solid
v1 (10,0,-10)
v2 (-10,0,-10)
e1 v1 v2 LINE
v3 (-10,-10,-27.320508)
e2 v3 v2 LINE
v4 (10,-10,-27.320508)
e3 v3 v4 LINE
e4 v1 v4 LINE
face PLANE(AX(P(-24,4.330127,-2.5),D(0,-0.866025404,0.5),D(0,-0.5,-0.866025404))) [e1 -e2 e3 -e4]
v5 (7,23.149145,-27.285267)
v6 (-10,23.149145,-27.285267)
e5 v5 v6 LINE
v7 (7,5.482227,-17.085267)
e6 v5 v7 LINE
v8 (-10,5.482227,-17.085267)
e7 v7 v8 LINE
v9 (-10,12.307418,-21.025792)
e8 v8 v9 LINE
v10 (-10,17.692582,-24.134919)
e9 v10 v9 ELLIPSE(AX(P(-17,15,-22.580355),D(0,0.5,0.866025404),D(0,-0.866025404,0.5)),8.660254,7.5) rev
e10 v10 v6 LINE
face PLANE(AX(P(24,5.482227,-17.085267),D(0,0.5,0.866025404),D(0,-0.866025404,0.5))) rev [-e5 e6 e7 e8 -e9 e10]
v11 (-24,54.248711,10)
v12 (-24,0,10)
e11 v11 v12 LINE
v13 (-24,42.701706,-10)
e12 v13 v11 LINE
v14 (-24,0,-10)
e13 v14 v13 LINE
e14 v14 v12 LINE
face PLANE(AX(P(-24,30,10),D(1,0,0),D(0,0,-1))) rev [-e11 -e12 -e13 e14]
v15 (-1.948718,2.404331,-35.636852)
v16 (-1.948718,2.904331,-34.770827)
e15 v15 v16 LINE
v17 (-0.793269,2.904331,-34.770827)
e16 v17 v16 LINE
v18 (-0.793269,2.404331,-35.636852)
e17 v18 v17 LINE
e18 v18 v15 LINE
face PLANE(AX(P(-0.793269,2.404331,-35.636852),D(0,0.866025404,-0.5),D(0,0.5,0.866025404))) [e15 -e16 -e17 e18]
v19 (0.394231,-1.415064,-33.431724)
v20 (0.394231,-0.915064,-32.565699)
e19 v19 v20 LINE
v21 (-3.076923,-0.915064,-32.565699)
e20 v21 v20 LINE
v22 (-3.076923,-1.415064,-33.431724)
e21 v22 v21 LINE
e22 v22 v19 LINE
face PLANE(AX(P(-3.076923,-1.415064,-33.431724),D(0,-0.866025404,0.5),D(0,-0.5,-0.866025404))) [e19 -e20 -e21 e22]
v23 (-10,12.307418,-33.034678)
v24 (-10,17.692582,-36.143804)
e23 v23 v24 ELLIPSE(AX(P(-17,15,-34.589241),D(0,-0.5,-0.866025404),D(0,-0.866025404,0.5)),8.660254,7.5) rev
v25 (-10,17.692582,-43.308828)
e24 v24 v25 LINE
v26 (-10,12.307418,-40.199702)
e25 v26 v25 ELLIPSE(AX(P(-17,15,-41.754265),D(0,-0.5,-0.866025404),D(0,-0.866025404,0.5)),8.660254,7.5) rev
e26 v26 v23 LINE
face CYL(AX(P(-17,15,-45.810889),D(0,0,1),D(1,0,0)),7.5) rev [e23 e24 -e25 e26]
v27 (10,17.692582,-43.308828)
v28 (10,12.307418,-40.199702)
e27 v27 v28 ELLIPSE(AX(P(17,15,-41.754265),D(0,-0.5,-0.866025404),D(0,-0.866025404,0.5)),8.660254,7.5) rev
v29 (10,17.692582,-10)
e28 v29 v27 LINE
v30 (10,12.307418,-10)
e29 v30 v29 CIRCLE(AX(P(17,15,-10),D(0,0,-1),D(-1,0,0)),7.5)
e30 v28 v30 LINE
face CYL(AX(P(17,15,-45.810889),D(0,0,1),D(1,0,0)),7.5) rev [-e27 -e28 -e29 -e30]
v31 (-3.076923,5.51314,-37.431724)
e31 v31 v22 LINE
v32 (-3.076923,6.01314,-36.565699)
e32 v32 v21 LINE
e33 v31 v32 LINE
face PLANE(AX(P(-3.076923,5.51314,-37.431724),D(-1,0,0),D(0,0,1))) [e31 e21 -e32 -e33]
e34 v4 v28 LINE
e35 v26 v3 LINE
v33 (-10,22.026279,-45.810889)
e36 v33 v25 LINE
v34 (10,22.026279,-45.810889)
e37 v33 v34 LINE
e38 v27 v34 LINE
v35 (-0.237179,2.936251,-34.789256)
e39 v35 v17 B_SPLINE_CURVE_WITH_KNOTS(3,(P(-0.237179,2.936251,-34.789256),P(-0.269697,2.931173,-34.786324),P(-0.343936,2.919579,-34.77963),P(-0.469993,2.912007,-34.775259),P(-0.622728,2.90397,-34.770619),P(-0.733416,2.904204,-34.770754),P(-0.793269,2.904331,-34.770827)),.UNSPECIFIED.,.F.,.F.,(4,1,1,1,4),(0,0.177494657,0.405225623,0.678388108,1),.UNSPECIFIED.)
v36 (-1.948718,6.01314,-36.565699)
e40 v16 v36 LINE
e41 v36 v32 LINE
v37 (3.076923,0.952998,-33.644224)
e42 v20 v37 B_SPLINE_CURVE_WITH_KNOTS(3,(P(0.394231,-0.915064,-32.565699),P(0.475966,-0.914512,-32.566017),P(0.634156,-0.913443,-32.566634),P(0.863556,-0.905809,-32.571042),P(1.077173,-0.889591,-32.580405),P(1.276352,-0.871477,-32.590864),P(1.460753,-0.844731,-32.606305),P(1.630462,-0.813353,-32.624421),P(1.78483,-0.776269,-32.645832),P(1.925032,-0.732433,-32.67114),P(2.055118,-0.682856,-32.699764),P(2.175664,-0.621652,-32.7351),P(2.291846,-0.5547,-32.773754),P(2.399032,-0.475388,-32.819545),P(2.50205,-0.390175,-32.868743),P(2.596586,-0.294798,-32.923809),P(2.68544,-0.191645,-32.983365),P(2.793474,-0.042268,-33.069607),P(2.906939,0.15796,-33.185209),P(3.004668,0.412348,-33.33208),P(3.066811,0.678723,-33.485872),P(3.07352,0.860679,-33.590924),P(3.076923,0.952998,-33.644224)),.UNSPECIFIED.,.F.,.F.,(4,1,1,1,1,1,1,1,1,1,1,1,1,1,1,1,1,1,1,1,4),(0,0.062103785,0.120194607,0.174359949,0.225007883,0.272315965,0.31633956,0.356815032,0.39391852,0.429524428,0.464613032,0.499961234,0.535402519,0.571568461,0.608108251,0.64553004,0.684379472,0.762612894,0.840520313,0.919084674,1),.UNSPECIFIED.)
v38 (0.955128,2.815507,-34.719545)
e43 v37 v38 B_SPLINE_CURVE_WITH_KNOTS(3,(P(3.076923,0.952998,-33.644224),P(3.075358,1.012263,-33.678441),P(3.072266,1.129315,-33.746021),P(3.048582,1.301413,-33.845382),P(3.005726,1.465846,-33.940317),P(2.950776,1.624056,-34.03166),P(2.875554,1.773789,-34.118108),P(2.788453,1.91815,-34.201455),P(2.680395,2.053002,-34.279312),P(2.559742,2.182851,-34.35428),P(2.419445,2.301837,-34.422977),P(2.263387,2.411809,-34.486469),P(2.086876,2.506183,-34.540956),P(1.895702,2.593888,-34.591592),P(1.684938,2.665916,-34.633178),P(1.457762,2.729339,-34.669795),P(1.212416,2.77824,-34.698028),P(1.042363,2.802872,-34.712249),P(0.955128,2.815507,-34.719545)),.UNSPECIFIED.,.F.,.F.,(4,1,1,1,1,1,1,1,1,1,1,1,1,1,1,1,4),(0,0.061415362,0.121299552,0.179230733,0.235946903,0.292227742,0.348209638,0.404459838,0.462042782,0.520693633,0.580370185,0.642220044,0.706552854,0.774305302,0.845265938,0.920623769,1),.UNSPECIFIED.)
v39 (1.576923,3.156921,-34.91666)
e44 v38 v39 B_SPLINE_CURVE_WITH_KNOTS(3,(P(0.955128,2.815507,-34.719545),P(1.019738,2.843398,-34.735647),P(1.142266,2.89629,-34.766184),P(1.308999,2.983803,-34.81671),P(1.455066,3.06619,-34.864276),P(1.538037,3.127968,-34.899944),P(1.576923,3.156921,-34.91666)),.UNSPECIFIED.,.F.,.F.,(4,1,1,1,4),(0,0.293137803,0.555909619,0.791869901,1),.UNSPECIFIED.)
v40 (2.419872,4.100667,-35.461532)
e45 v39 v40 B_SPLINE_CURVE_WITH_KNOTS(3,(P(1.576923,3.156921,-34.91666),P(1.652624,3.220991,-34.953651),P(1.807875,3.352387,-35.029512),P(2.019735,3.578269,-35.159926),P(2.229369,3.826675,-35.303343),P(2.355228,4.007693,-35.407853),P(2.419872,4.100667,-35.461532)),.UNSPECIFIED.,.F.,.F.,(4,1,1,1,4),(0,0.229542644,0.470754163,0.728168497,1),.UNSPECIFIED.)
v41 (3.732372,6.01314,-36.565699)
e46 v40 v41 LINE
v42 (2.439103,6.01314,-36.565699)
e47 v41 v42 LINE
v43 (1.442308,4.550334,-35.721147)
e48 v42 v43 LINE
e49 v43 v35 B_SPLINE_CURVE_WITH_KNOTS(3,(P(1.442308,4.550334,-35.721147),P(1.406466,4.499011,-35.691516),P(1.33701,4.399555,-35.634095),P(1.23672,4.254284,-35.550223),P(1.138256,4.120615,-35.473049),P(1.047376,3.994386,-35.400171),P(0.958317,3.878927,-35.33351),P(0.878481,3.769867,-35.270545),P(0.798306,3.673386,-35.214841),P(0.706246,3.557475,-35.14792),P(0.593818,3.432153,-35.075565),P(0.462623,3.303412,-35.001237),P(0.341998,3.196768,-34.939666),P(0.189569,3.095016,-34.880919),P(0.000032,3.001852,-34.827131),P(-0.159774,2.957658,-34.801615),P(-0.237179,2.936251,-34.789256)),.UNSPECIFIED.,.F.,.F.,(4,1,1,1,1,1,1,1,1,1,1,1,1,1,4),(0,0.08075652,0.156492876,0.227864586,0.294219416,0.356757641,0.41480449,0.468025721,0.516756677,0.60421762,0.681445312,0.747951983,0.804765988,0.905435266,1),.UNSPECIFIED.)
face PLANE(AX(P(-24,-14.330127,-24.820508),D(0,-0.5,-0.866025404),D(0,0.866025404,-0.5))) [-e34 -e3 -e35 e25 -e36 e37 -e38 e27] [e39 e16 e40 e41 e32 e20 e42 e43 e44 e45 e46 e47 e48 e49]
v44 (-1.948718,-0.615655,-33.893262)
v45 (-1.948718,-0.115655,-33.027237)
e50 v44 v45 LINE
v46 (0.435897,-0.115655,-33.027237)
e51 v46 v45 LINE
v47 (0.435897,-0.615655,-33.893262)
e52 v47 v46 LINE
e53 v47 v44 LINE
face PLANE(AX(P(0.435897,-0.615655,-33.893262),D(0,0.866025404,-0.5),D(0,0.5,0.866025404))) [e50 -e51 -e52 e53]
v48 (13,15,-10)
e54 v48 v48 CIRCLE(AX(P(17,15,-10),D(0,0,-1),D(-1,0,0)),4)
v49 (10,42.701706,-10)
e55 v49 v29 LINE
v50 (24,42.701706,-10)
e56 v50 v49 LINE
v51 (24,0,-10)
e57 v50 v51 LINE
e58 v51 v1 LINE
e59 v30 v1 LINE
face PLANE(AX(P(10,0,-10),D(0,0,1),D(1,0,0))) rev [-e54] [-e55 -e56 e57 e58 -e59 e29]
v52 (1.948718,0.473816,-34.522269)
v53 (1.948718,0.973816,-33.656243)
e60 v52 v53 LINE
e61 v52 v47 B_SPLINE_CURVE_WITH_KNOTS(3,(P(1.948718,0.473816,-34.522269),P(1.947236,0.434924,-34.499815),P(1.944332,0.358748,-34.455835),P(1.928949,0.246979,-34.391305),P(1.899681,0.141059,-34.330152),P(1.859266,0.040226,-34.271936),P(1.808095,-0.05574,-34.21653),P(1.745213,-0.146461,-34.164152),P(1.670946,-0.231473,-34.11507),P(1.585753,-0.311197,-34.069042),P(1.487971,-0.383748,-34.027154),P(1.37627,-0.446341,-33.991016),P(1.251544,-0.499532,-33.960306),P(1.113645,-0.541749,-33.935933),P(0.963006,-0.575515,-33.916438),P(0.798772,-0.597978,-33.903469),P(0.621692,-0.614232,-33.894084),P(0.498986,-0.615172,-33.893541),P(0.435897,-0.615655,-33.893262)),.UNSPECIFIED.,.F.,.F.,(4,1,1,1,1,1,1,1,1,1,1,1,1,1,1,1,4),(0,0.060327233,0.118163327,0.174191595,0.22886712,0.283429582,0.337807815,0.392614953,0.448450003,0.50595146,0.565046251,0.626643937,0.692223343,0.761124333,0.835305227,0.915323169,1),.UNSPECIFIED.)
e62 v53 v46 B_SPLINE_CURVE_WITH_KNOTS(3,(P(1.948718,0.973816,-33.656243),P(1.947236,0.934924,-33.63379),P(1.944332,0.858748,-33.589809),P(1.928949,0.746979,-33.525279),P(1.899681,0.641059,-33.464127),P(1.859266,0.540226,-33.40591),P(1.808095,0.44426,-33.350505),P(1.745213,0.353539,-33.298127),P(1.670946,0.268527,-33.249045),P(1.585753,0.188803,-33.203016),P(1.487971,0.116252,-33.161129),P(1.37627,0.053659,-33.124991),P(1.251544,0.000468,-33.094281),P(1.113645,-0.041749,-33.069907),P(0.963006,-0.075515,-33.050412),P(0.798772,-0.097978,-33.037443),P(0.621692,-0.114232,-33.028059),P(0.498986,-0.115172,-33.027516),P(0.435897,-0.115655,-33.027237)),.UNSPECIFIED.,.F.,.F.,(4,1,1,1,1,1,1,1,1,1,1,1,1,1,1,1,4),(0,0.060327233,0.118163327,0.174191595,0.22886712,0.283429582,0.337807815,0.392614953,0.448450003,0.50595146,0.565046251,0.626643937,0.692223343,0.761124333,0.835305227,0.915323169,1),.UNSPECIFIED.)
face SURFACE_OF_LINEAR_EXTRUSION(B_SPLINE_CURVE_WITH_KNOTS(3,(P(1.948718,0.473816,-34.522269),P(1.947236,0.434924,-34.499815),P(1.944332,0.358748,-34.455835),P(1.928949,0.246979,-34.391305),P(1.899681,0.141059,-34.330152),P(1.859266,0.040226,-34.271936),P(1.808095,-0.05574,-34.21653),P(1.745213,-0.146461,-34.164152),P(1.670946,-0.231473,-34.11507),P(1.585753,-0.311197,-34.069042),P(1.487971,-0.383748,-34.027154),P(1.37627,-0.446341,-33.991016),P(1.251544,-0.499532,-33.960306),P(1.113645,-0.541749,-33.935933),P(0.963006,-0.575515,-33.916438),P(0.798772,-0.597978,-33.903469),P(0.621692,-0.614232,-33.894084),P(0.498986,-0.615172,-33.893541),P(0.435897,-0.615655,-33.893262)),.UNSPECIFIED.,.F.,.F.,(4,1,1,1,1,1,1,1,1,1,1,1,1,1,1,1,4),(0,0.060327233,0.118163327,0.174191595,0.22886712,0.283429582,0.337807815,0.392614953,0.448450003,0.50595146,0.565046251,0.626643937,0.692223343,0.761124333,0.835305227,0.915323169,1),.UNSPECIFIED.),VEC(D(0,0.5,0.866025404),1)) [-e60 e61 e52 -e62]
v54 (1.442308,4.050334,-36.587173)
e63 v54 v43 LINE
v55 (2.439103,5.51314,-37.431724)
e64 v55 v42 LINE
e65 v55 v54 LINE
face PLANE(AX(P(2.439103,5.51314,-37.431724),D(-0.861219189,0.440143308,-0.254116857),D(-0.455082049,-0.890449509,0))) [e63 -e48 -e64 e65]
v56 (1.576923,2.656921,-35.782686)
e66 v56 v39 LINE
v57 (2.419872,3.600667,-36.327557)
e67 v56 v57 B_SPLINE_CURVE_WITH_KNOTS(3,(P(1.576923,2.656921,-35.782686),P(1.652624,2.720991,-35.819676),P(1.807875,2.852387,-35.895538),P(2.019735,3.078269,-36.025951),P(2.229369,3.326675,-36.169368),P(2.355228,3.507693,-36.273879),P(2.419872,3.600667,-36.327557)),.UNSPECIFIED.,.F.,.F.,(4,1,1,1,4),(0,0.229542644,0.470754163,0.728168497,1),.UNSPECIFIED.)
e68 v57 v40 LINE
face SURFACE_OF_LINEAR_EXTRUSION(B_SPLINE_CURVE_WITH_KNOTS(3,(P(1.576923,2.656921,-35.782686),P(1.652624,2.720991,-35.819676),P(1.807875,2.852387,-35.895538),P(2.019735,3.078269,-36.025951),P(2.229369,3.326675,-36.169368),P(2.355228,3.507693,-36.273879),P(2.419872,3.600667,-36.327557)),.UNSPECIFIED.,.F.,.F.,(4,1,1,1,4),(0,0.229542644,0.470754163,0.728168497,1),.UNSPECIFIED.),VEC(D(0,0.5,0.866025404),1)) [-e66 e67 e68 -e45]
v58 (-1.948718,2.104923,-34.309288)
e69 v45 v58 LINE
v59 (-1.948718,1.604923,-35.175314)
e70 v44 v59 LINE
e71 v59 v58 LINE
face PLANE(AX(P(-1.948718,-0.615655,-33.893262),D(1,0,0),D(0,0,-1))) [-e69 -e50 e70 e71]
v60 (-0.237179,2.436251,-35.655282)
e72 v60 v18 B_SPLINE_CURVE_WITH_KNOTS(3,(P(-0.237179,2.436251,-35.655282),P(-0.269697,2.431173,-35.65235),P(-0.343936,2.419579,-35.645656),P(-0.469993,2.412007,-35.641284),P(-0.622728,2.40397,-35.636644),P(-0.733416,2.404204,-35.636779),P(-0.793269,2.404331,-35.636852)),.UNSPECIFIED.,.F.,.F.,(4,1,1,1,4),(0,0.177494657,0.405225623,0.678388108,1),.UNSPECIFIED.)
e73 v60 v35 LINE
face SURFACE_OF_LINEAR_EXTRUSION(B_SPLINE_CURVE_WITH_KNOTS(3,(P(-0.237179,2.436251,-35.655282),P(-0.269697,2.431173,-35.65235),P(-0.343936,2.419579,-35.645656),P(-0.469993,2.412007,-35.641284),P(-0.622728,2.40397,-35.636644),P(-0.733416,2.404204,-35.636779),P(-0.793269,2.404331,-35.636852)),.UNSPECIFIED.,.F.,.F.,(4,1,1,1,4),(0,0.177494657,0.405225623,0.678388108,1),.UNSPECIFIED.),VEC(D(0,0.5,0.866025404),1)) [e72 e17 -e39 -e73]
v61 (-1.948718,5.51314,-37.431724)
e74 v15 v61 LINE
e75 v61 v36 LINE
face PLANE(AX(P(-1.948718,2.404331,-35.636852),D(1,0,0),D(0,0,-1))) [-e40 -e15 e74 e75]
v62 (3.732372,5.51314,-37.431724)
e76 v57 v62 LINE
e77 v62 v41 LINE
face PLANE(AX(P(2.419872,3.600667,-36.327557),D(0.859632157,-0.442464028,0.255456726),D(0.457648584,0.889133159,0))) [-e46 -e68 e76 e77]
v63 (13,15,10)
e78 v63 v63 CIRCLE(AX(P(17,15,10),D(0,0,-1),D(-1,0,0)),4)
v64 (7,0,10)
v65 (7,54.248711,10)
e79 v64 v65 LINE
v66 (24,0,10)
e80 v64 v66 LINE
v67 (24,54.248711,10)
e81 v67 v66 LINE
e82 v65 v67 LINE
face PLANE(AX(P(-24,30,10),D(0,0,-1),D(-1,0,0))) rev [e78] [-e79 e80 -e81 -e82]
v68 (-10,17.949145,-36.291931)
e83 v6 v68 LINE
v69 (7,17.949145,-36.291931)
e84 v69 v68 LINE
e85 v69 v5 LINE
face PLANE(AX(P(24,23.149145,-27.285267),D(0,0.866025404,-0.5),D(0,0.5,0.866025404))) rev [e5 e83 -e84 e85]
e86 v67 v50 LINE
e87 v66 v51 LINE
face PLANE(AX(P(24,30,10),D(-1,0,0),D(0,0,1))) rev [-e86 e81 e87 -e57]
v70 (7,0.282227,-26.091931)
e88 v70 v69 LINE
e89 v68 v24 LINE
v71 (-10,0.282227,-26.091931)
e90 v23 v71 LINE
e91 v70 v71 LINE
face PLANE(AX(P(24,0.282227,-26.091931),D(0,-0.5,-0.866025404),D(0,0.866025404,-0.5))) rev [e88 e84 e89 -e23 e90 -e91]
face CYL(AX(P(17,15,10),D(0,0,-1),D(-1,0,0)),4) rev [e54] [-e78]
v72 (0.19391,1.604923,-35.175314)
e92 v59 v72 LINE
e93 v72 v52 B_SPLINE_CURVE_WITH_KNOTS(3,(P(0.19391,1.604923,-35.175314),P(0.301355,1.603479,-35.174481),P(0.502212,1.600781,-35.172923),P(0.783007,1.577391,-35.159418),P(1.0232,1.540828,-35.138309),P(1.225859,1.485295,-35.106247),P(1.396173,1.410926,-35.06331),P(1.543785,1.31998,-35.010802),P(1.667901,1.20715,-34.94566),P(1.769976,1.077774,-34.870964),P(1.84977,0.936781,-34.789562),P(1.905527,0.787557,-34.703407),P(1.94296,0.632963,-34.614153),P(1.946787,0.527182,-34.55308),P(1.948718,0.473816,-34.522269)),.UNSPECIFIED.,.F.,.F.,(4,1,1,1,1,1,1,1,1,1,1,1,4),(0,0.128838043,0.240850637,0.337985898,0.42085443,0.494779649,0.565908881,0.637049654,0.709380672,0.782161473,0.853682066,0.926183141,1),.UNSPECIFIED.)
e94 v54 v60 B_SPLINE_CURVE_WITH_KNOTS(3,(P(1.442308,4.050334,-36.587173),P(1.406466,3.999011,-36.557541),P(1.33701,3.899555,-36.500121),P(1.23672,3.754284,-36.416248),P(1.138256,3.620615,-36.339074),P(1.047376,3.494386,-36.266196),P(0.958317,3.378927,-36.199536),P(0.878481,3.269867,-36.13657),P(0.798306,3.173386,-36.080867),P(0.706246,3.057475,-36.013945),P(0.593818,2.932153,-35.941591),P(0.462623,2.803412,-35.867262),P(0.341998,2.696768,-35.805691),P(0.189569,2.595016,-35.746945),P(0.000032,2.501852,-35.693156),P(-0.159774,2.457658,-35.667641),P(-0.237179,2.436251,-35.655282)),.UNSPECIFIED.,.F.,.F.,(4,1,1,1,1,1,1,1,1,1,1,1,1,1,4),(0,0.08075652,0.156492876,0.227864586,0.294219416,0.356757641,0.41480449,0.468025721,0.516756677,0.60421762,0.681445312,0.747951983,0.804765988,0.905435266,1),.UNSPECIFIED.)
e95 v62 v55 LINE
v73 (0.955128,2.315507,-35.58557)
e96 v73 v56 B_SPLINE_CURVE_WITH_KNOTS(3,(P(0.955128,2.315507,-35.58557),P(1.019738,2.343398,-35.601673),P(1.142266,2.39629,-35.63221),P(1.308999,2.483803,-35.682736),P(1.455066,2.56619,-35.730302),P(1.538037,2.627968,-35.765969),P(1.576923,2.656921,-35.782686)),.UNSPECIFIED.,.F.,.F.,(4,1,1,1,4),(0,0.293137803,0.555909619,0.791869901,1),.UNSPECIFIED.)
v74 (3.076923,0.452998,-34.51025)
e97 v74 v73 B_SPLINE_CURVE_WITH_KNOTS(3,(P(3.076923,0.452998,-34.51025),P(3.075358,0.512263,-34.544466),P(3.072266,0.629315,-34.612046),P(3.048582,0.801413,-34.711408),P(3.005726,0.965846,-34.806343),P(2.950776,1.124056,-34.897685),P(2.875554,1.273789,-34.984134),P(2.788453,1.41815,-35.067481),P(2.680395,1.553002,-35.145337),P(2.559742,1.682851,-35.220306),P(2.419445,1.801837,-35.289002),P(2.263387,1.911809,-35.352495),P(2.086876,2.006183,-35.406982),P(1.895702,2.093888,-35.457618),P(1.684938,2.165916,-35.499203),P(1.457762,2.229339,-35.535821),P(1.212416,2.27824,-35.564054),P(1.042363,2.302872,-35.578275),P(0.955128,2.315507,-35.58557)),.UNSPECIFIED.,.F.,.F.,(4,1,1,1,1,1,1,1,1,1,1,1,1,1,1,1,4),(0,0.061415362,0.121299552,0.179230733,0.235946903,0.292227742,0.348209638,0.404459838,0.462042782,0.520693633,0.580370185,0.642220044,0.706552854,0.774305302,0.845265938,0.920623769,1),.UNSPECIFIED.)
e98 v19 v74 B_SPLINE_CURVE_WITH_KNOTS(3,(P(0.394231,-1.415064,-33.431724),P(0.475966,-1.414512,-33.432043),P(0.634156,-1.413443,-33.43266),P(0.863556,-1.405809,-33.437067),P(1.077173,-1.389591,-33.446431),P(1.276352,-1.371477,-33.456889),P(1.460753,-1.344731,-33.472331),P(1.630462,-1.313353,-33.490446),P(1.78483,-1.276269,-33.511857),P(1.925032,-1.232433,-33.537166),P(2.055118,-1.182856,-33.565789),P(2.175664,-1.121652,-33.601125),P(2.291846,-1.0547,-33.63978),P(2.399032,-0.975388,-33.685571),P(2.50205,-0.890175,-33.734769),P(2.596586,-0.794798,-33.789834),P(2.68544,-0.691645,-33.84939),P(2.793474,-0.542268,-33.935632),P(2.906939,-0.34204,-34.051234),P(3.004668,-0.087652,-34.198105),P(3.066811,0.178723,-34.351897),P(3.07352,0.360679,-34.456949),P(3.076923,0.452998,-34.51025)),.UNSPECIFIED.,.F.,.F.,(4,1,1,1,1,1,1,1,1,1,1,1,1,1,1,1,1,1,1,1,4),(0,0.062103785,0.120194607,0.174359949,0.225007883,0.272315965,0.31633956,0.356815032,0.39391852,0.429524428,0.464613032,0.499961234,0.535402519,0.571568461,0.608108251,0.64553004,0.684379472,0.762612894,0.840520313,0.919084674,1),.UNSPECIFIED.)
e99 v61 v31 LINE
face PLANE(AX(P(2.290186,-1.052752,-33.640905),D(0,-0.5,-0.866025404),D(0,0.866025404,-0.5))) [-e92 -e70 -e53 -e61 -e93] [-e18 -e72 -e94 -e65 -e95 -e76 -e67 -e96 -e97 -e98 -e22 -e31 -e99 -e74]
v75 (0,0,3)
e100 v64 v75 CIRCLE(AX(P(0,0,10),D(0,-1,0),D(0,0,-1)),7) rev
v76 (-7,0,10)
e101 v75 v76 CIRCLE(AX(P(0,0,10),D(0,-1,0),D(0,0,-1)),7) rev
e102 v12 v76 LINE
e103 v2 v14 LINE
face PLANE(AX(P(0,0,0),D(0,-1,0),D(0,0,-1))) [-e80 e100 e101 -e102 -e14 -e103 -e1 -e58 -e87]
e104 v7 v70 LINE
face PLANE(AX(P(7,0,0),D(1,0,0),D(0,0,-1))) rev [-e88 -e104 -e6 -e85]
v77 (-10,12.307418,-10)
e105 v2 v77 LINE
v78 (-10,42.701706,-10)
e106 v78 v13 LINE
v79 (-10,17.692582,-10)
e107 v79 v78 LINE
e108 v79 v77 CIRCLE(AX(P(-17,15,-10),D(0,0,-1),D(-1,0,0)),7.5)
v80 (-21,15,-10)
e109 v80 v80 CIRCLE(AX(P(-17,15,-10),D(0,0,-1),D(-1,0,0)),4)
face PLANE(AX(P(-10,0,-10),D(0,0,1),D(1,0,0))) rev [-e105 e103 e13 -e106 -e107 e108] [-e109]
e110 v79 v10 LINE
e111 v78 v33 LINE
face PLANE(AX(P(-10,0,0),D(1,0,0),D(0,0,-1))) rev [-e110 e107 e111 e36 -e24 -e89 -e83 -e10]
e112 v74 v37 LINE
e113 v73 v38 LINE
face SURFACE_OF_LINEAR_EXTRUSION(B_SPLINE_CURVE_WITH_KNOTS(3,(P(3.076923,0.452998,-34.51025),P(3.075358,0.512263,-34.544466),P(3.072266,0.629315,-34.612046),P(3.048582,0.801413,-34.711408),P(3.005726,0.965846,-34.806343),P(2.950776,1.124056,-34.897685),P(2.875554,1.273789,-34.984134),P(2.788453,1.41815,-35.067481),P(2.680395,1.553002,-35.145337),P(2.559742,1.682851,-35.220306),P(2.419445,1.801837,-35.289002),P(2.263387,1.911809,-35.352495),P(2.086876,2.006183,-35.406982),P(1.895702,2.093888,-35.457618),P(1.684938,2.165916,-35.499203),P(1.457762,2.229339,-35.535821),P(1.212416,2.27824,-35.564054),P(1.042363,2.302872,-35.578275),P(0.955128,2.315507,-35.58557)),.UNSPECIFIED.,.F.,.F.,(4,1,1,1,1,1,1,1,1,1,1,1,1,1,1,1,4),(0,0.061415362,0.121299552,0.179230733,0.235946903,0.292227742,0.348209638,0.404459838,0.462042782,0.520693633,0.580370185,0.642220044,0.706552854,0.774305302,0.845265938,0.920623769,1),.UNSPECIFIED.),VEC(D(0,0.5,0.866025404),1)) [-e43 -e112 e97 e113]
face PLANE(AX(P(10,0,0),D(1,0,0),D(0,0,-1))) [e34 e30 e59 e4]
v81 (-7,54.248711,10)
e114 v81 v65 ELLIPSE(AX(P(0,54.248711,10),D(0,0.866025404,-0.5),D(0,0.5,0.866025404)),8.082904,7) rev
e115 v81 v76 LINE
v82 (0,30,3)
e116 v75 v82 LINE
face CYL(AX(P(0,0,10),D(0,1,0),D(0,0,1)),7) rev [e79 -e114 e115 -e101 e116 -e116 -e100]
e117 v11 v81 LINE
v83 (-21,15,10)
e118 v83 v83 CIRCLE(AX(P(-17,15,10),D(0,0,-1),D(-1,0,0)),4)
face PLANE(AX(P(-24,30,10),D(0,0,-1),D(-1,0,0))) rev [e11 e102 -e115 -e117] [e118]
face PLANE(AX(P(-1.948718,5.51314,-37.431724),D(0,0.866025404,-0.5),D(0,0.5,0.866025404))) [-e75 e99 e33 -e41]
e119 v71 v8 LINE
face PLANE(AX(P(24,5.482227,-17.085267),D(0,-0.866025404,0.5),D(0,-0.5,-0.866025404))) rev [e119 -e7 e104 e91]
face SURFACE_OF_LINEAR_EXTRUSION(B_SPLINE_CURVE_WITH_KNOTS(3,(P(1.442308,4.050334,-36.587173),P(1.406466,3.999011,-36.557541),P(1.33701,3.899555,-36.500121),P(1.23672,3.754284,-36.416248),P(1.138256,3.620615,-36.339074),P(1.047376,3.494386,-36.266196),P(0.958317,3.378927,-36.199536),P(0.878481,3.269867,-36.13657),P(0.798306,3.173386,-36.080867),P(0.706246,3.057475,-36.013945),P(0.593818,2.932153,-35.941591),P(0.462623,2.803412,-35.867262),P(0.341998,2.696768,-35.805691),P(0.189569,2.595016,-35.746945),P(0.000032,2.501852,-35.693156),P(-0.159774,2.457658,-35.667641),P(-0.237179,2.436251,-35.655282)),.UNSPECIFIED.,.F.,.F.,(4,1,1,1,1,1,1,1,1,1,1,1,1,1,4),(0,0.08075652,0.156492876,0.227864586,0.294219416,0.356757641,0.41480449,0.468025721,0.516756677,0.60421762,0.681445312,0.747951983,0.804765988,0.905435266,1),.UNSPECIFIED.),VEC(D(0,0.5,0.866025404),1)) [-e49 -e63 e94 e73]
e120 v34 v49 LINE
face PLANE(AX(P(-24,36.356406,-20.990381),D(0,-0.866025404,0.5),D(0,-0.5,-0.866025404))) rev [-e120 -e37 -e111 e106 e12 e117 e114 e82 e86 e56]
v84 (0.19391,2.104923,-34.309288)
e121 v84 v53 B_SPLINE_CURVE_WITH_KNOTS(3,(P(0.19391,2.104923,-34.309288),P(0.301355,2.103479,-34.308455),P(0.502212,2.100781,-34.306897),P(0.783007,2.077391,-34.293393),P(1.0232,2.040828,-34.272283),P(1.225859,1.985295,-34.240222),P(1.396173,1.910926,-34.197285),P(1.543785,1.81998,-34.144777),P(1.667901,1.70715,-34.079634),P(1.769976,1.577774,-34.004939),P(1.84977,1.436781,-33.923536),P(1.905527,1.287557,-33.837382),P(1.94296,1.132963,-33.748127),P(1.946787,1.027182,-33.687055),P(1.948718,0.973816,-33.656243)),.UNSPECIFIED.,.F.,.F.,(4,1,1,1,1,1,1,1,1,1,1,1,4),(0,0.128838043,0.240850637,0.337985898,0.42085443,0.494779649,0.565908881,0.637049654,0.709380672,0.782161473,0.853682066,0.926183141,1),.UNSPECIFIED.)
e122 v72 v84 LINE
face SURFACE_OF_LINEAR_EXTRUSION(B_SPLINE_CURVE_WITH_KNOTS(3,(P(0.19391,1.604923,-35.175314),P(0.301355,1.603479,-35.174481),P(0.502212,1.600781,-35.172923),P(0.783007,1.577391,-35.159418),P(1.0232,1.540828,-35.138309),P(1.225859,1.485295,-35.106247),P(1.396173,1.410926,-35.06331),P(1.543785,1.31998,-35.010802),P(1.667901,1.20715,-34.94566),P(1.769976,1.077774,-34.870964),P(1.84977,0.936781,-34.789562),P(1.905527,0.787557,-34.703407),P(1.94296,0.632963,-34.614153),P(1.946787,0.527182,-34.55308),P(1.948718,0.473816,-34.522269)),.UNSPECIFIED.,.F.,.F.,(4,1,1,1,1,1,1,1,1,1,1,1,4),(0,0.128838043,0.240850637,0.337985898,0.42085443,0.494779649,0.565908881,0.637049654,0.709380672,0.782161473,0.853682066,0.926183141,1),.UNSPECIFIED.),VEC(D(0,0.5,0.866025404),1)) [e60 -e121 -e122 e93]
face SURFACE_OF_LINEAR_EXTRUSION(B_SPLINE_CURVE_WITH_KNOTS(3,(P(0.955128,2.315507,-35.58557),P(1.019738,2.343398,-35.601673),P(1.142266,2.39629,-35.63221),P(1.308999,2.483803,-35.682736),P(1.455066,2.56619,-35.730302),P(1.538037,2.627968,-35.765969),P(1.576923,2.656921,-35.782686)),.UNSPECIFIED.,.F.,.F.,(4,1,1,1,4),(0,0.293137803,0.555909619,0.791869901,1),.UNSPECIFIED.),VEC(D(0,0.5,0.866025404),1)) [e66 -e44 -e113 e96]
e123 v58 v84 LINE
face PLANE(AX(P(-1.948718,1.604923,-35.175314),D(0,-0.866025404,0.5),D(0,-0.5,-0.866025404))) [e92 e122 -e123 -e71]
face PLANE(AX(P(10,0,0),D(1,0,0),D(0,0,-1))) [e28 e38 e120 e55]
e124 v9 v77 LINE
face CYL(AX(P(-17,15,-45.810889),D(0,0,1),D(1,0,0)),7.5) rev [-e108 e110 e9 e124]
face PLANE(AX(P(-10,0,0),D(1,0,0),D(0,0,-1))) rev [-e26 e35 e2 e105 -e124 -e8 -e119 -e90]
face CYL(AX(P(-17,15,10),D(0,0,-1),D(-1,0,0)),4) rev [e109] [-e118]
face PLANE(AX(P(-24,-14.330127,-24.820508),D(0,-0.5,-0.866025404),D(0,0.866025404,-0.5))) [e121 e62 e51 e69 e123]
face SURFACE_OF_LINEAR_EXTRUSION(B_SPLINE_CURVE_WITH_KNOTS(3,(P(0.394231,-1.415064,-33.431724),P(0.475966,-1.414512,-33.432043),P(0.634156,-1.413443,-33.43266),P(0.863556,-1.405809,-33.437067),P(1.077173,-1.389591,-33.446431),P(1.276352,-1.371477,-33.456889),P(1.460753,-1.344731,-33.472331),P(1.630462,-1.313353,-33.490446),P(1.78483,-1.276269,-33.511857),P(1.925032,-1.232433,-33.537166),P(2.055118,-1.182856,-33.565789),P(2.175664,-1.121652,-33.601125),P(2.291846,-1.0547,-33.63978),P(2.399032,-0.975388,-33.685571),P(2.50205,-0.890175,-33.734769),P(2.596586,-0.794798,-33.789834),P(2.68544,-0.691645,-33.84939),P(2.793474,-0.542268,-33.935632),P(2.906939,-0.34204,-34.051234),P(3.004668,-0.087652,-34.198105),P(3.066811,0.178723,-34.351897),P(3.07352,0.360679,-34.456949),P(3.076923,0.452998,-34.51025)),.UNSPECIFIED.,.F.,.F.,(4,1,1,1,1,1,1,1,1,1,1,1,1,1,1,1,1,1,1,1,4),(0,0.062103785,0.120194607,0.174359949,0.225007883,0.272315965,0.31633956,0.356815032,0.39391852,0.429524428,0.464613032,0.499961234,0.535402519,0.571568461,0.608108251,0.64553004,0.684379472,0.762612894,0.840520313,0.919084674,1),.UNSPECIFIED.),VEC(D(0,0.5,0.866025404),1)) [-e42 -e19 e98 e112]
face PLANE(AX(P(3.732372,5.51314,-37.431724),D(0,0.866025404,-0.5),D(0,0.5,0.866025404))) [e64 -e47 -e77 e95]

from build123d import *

# Parameters (mm, degrees)
SKETCH_1_W              = 48
SKETCH_1_H              = 20
EXTRUDE_1_DEPTH         = 30
SKETCH_2_W              = 14
SKETCH_2_H              = 30
CUT_EXTRUDE_1_DEPTH     = 7
EXTRUDE_2_DEPTH         = 48
CUT_EXTRUDE_2_DEPTH     = 14
CUT_EXTRUDE_3_DEPTH     = 14
CUT_EXTRUDE_4_DEPTH     = 65.456478054
SKETCH_13_R             = 4
CUT_EXTRUDE_5_DEPTH     = 53.52066051
SKETCH_14_R             = 4
CUT_EXTRUDE_6_DEPTH     = 53.52066051
FILLET_1_R              = 7
EXTRUDE_3_DEPTH         = 3
EXTRUDE_5_DEPTH         = 1
SKETCH_20_R             = 7.5
CUT_EXTRUDE_8_DEPTH     = 53.520660579
BOSS_EXTRUDE1_DEPTH     = 25
CUT_EXTRUDE1_DEPTH      = 80.244164279
CUT_EXTRUDE1_DEPTH_BACK = 80.244164279


with BuildPart() as part:
    # Эскиз1 → Бобышка-Вытянуть1 (new body)
    with BuildSketch(Plane(origin=(0, 0, 0), x_dir=(1, 0, 0), z_dir=(0, 1, 0))):
        Rectangle(SKETCH_1_W, SKETCH_1_H)
    extrude(amount=EXTRUDE_1_DEPTH)

    # Эскиз2 → Вырез-Вытянуть1 (cut)
    with BuildSketch(Plane.XY.offset(10)):
        with Locations((0, 15)):
            Rectangle(SKETCH_2_W, SKETCH_2_H)
    extrude(amount=-CUT_EXTRUDE_1_DEPTH, mode=Mode.SUBTRACT)

    # Эскиз7 → Бобышка-Вытянуть2 (add)
    with BuildSketch(Plane(origin=(24, 0, 0), x_dir=(0, 0, -1), z_dir=(1, 0, 0))):
        Polygon((10, 0), (27.320508076, -10), (45.810889132, 22.026279442), (32, 30), (10, 30), align=None)
    extrude(amount=-EXTRUDE_2_DEPTH)

    # Эскиз8 → Вырез-Вытянуть2 (cut)
    with BuildSketch(Plane(origin=(24, 0, 0), x_dir=(0, 0, -1), z_dir=(1, 0, 0))):
        Polygon((10, 0), (10, 30), (32, 30), (45.810889132, 22.026279442), (27.320508076, -10), align=None)
    extrude(amount=-CUT_EXTRUDE_2_DEPTH, mode=Mode.SUBTRACT)

    # Эскиз9 → Вырез-Вытянуть3 (cut)
    with BuildSketch(Plane.ZY.offset(24)):
        Polygon((-10, 0), (-10, 30), (-32, 30), (-45.810889132, 22.026279442), (-27.320508076, -10), align=None)
    extrude(amount=-CUT_EXTRUDE_3_DEPTH, mode=Mode.SUBTRACT)

    # Эскиз11 → Вырез-Вытянуть4 (cut, through all)
    with BuildSketch(Plane.ZY.offset(10)):
        Polygon((-17.085266521, 5.482226936), (-27.285266521, 23.149145173), (-36.291930721, 17.949145173), (-26.091930721, 0.282226936), align=None)
    extrude(amount=-CUT_EXTRUDE_4_DEPTH, mode=Mode.SUBTRACT)

    # Эскиз13 → Вырез-Вытянуть5 (cut, through all)
    with BuildSketch(Plane(origin=(0, 0, -10), x_dir=(-1, 0, 0), z_dir=(0, 0, -1))):
        with Locations((17, 15)):
            Circle(SKETCH_13_R)
    extrude(amount=-CUT_EXTRUDE_5_DEPTH, mode=Mode.SUBTRACT)

    # Эскиз14 → Вырез-Вытянуть6 (cut, through all)
    with BuildSketch(Plane(origin=(0, 0, -10), x_dir=(-1, 0, 0), z_dir=(0, 0, -1))):
        with Locations((-17, 15)):
            Circle(SKETCH_14_R)
    extrude(amount=-CUT_EXTRUDE_6_DEPTH, mode=Mode.SUBTRACT)

    # Скругление1
    fillet_1_edges = [part.edges().sort_by_distance(p)[0] for p in [
        (-7, 15, 3),
        (7, 15, 3),
    ]]
    fillet(fillet_1_edges, radius=FILLET_1_R - 0.0001)  # a hair under: the kernel refuses the full size

    # Эскиз16 → Бобышка-Вытянуть3 (add)
    with BuildSketch(Plane(origin=(10, 0, 0), x_dir=(0, 0, -1), z_dir=(1, 0, 0))):
        Polygon((27.285266521, 23.149145173), (17.085266521, 5.482226936), (26.091930721, 0.282226936), (36.291930721, 17.949145173), align=None)
    extrude(amount=-EXTRUDE_3_DEPTH)

    # Эскиз18 → Бобышка-Вытянуть5 (add)
    with BuildSketch(Plane(origin=(0, -14.330127019, -24.820508076), x_dir=(-1, 0, 0), z_dir=(0, -0.4999999999999885, -0.8660254037844454))):
        with BuildLine():
            Line((3.076923077, 23.490381057), (3.076923077, 15.490381057))
            Line((3.076923077, 15.490381057), (-0.394230769, 15.490381057))
            add(Edge.make_bspline(
                [(-0.394230769, 15.490381057), (-0.475966203, 15.49101845), (-0.634155568, 15.49225205), (-0.863556464, 15.501067061), (-1.077173272, 15.519794557), (-1.276352297, 15.540710881), (-1.460752713, 15.571594241), (-1.630462401, 15.607825992), (-1.784830485, 15.650647709), (-1.925031539, 15.701264755), (-2.055118116, 15.758511595), (-2.175664232, 15.829183977), (-2.291845901, 15.906492451), (-2.399031866, 15.998074814), (-2.502049745, 16.096470161), (-2.596586483, 16.206601733), (-2.685439891, 16.325713037), (-2.793473896, 16.498197991), (-2.906939016, 16.729401784), (-3.004668447, 17.02314385), (-3.06681146, 17.330727068), (-3.073519576, 17.5408315), (-3.076923077, 17.647432339)],
                knots=[0, 0, 0, 0, 1.242075696, 2.40389213, 3.487198984, 4.500157661, 5.446319301, 6.326791195, 7.136300648, 7.878370406, 8.590488565, 9.292260633, 9.999224673, 10.708050372, 11.431369221, 12.162165018, 12.910600795, 13.687589445, 15.252257874, 16.810406251, 18.381693487, 20, 20, 20, 20], degree=3))
            add(Edge.make_bspline(
                [(-3.076923077, 17.647432339), (-3.075357604, 17.715865612), (-3.072265688, 17.851026019), (-3.048581646, 18.049748215), (-3.005726368, 18.239618444), (-2.950775925, 18.42230348), (-2.87555432, 18.595200652), (-2.788453183, 18.761894703), (-2.680395045, 18.917607923), (-2.559742342, 19.067544403), (-2.419445088, 19.204937793), (-2.263386964, 19.331922341), (-2.086876234, 19.440896432), (-1.89570213, 19.542168691), (-1.684937787, 19.625339579), (-1.457761732, 19.698574242), (-1.21241575, 19.755040234), (-1.042362796, 19.783482773), (-0.955128205, 19.798073364)],
                knots=[0, 0, 0, 0, 0.982645791, 1.940792824, 2.867691729, 3.775150443, 4.675643875, 5.571354211, 6.471357401, 7.392684514, 8.331098131, 9.285922955, 10.275520706, 11.304845665, 12.388884831, 13.524255008, 14.729980297, 16, 16, 16, 16], degree=3))
            add(Edge.make_bspline(
                [(-0.955128205, 19.798073364), (-1.019738399, 19.830278555), (-1.14226585, 19.891352818), (-1.308999482, 19.992404668), (-1.455065559, 20.087536339), (-1.53803712, 20.158871679), (-1.576923077, 20.192304134)],
                knots=[0, 0, 0, 0, 1.172551213, 2.223638478, 3.167479604, 4, 4, 4, 4], degree=3))
            add(Edge.make_bspline(
                [(-1.576923077, 20.192304134), (-1.652624383, 20.266285408), (-1.807875296, 20.418008818), (-2.019735444, 20.678834883), (-2.229368535, 20.965668904), (-2.355227865, 21.174690137), (-2.419871795, 21.282047723)],
                knots=[0, 0, 0, 0, 0.918170575, 1.883016652, 2.912673989, 4, 4, 4, 4], degree=3))
            Line((-2.419871795, 21.282047723), (-3.732371795, 23.490381057))
            Line((-3.732371795, 23.490381057), (-2.439102564, 23.490381057))
            Line((-2.439102564, 23.490381057), (-1.442307692, 21.801278493))
            add(Edge.make_bspline(
                [(-1.442307692, 21.801278493), (-1.406465761, 21.74201577), (-1.337009983, 21.627174345), (-1.236719552, 21.459429826), (-1.138255761, 21.30508177), (-1.047376022, 21.15932531), (-0.958316878, 21.02600434), (-0.878481314, 20.900073272), (-0.798305584, 20.788666158), (-0.706246053, 20.654823189), (-0.593818414, 20.510114732), (-0.462623309, 20.361457059), (-0.34199814, 20.238315643), (-0.18956943, 20.120822362), (-3.2323e-05, 20.013245791), (0.159774488, 19.962214344), (0.237179487, 19.937496441)],
                knots=[0, 0, 0, 0, 1.130591283, 2.190900266, 3.190104209, 4.119071823, 4.994606968, 5.807262858, 6.55236009, 7.234593472, 8.459046683, 9.540234366, 10.471327768, 11.266723835, 12.676093724, 14, 14, 14, 14], degree=3))
            add(Edge.make_bspline(
                [(0.237179487, 19.937496441), (0.269697183, 19.931632396), (0.343936058, 19.918244603), (0.469993483, 19.909501015), (0.622727518, 19.900220866), (0.733416476, 19.900491258), (0.793269231, 19.900637467)],
                knots=[0, 0, 0, 0, 0.709978628, 1.620902492, 2.713552433, 4, 4, 4, 4], degree=3))
            Line((0.793269231, 19.900637467), (1.948717949, 19.900637467))
            Line((1.948717949, 19.900637467), (1.948717949, 23.490381057))
            Line((1.948717949, 23.490381057), (3.076923077, 23.490381057))
        make_face()
        with BuildLine():
            Line((1.948717949, 18.977560544), (-0.193910256, 18.977560544))
            add(Edge.make_bspline(
                [(-0.193910256, 18.977560544), (-0.301354607, 18.97589409), (-0.502211742, 18.972778811), (-0.783007271, 18.945769758), (-1.023200158, 18.903550736), (-1.225858519, 18.839427155), (-1.396173113, 18.753553027), (-1.54378517, 18.648537277), (-1.667901131, 18.51825252), (-1.769975791, 18.368861713), (-1.849770319, 18.206056724), (-1.90552669, 18.03374763), (-1.942959563, 17.855238544), (-1.946787014, 17.733092852), (-1.948717949, 17.6714708)],
                knots=[0, 0, 0, 0, 1.546056516, 2.890207646, 4.055830773, 5.050253158, 5.937355789, 6.790906573, 7.644595853, 8.512568064, 9.38593768, 10.244184789, 11.114197691, 12, 12, 12, 12], degree=3))
            add(Edge.make_bspline(
                [(-1.948717949, 17.6714708), (-1.947235583, 17.626563151), (-1.944332064, 17.538602257), (-1.928948857, 17.409542216), (-1.89968097, 17.287236957), (-1.859266003, 17.17080484), (-1.808094758, 17.059993077), (-1.745213393, 16.955237495), (-1.670946372, 16.857073145), (-1.585753391, 16.765016757), (-1.487970747, 16.681241729), (-1.376270424, 16.608965458), (-1.251544399, 16.547545272), (-1.113644587, 16.498798364), (-0.963006292, 16.459808698), (-0.798771701, 16.43387015), (-0.621691971, 16.415101097), (-0.498985984, 16.414015918), (-0.435897436, 16.41345798)],
                knots=[0, 0, 0, 0, 0.965235723, 1.89061323, 2.787065514, 3.661873922, 4.534873316, 5.404925039, 6.281839248, 7.175200054, 8.095223355, 9.040740021, 10.02630299, 11.075573487, 12.177989335, 13.364883635, 14.645170704, 16, 16, 16, 16], degree=3))
            Line((-0.435897436, 16.41345798), (1.948717949, 16.41345798))
            Line((1.948717949, 16.41345798), (1.948717949, 18.977560544))
        make_face(mode=Mode.SUBTRACT)
    extrude(amount=EXTRUDE_5_DEPTH)

    # Эскиз20 → Вырез-Вытянуть8 (cut, through all)
    with BuildSketch(Plane(origin=(0, 0, -10), x_dir=(-1, 0, 0), z_dir=(0, 0, -1))):
        with Locations((-17, 15)):
            Circle(SKETCH_20_R)
        with Locations((17, 15)):
            Circle(SKETCH_20_R)
    extrude(amount=CUT_EXTRUDE_8_DEPTH, mode=Mode.SUBTRACT)

    # Sketch3 → Boss-Extrude1 (add)
    with BuildSketch(Plane(origin=(0, 30, 0), x_dir=(1, 0, 0), z_dir=(0, 1, 0))):
        with BuildLine():
            Line((7, -10), (24, -10))
            Line((24, -10), (24, 10))
            Line((24, 10), (10, 10))
            Line((10, 10), (10, 32))
            Line((10, 32), (-10, 32))
            Line((-10, 32), (-10, 10))
            Line((-10, 10), (-24, 10))
            Line((-24, 10), (-24, -10))
            Line((-24, -10), (-7, -10))
            ThreePointArc((-7, -10), (0, -3), (7, -10))
        make_face()
    extrude(amount=BOSS_EXTRUDE1_DEPTH)

    # Sketch4 → Cut-Extrude1 (cut, two sides: drawn at the far end of the back side and taken through both)
    with BuildSketch(Plane.ZY.offset(10).offset(-CUT_EXTRUDE1_DEPTH_BACK)):
        Polygon((-251.050138586, -96.468656479), (-45.810889132, 22.026279442), (35.63071017, 69.046608722), (240.869959624, 187.541544642), (3.880087783, 598.020043549), (-488.040010426, 314.009842428), align=None)
    extrude(amount=CUT_EXTRUDE1_DEPTH + CUT_EXTRUDE1_DEPTH_BACK, mode=Mode.SUBTRACT)


solid = part.part
